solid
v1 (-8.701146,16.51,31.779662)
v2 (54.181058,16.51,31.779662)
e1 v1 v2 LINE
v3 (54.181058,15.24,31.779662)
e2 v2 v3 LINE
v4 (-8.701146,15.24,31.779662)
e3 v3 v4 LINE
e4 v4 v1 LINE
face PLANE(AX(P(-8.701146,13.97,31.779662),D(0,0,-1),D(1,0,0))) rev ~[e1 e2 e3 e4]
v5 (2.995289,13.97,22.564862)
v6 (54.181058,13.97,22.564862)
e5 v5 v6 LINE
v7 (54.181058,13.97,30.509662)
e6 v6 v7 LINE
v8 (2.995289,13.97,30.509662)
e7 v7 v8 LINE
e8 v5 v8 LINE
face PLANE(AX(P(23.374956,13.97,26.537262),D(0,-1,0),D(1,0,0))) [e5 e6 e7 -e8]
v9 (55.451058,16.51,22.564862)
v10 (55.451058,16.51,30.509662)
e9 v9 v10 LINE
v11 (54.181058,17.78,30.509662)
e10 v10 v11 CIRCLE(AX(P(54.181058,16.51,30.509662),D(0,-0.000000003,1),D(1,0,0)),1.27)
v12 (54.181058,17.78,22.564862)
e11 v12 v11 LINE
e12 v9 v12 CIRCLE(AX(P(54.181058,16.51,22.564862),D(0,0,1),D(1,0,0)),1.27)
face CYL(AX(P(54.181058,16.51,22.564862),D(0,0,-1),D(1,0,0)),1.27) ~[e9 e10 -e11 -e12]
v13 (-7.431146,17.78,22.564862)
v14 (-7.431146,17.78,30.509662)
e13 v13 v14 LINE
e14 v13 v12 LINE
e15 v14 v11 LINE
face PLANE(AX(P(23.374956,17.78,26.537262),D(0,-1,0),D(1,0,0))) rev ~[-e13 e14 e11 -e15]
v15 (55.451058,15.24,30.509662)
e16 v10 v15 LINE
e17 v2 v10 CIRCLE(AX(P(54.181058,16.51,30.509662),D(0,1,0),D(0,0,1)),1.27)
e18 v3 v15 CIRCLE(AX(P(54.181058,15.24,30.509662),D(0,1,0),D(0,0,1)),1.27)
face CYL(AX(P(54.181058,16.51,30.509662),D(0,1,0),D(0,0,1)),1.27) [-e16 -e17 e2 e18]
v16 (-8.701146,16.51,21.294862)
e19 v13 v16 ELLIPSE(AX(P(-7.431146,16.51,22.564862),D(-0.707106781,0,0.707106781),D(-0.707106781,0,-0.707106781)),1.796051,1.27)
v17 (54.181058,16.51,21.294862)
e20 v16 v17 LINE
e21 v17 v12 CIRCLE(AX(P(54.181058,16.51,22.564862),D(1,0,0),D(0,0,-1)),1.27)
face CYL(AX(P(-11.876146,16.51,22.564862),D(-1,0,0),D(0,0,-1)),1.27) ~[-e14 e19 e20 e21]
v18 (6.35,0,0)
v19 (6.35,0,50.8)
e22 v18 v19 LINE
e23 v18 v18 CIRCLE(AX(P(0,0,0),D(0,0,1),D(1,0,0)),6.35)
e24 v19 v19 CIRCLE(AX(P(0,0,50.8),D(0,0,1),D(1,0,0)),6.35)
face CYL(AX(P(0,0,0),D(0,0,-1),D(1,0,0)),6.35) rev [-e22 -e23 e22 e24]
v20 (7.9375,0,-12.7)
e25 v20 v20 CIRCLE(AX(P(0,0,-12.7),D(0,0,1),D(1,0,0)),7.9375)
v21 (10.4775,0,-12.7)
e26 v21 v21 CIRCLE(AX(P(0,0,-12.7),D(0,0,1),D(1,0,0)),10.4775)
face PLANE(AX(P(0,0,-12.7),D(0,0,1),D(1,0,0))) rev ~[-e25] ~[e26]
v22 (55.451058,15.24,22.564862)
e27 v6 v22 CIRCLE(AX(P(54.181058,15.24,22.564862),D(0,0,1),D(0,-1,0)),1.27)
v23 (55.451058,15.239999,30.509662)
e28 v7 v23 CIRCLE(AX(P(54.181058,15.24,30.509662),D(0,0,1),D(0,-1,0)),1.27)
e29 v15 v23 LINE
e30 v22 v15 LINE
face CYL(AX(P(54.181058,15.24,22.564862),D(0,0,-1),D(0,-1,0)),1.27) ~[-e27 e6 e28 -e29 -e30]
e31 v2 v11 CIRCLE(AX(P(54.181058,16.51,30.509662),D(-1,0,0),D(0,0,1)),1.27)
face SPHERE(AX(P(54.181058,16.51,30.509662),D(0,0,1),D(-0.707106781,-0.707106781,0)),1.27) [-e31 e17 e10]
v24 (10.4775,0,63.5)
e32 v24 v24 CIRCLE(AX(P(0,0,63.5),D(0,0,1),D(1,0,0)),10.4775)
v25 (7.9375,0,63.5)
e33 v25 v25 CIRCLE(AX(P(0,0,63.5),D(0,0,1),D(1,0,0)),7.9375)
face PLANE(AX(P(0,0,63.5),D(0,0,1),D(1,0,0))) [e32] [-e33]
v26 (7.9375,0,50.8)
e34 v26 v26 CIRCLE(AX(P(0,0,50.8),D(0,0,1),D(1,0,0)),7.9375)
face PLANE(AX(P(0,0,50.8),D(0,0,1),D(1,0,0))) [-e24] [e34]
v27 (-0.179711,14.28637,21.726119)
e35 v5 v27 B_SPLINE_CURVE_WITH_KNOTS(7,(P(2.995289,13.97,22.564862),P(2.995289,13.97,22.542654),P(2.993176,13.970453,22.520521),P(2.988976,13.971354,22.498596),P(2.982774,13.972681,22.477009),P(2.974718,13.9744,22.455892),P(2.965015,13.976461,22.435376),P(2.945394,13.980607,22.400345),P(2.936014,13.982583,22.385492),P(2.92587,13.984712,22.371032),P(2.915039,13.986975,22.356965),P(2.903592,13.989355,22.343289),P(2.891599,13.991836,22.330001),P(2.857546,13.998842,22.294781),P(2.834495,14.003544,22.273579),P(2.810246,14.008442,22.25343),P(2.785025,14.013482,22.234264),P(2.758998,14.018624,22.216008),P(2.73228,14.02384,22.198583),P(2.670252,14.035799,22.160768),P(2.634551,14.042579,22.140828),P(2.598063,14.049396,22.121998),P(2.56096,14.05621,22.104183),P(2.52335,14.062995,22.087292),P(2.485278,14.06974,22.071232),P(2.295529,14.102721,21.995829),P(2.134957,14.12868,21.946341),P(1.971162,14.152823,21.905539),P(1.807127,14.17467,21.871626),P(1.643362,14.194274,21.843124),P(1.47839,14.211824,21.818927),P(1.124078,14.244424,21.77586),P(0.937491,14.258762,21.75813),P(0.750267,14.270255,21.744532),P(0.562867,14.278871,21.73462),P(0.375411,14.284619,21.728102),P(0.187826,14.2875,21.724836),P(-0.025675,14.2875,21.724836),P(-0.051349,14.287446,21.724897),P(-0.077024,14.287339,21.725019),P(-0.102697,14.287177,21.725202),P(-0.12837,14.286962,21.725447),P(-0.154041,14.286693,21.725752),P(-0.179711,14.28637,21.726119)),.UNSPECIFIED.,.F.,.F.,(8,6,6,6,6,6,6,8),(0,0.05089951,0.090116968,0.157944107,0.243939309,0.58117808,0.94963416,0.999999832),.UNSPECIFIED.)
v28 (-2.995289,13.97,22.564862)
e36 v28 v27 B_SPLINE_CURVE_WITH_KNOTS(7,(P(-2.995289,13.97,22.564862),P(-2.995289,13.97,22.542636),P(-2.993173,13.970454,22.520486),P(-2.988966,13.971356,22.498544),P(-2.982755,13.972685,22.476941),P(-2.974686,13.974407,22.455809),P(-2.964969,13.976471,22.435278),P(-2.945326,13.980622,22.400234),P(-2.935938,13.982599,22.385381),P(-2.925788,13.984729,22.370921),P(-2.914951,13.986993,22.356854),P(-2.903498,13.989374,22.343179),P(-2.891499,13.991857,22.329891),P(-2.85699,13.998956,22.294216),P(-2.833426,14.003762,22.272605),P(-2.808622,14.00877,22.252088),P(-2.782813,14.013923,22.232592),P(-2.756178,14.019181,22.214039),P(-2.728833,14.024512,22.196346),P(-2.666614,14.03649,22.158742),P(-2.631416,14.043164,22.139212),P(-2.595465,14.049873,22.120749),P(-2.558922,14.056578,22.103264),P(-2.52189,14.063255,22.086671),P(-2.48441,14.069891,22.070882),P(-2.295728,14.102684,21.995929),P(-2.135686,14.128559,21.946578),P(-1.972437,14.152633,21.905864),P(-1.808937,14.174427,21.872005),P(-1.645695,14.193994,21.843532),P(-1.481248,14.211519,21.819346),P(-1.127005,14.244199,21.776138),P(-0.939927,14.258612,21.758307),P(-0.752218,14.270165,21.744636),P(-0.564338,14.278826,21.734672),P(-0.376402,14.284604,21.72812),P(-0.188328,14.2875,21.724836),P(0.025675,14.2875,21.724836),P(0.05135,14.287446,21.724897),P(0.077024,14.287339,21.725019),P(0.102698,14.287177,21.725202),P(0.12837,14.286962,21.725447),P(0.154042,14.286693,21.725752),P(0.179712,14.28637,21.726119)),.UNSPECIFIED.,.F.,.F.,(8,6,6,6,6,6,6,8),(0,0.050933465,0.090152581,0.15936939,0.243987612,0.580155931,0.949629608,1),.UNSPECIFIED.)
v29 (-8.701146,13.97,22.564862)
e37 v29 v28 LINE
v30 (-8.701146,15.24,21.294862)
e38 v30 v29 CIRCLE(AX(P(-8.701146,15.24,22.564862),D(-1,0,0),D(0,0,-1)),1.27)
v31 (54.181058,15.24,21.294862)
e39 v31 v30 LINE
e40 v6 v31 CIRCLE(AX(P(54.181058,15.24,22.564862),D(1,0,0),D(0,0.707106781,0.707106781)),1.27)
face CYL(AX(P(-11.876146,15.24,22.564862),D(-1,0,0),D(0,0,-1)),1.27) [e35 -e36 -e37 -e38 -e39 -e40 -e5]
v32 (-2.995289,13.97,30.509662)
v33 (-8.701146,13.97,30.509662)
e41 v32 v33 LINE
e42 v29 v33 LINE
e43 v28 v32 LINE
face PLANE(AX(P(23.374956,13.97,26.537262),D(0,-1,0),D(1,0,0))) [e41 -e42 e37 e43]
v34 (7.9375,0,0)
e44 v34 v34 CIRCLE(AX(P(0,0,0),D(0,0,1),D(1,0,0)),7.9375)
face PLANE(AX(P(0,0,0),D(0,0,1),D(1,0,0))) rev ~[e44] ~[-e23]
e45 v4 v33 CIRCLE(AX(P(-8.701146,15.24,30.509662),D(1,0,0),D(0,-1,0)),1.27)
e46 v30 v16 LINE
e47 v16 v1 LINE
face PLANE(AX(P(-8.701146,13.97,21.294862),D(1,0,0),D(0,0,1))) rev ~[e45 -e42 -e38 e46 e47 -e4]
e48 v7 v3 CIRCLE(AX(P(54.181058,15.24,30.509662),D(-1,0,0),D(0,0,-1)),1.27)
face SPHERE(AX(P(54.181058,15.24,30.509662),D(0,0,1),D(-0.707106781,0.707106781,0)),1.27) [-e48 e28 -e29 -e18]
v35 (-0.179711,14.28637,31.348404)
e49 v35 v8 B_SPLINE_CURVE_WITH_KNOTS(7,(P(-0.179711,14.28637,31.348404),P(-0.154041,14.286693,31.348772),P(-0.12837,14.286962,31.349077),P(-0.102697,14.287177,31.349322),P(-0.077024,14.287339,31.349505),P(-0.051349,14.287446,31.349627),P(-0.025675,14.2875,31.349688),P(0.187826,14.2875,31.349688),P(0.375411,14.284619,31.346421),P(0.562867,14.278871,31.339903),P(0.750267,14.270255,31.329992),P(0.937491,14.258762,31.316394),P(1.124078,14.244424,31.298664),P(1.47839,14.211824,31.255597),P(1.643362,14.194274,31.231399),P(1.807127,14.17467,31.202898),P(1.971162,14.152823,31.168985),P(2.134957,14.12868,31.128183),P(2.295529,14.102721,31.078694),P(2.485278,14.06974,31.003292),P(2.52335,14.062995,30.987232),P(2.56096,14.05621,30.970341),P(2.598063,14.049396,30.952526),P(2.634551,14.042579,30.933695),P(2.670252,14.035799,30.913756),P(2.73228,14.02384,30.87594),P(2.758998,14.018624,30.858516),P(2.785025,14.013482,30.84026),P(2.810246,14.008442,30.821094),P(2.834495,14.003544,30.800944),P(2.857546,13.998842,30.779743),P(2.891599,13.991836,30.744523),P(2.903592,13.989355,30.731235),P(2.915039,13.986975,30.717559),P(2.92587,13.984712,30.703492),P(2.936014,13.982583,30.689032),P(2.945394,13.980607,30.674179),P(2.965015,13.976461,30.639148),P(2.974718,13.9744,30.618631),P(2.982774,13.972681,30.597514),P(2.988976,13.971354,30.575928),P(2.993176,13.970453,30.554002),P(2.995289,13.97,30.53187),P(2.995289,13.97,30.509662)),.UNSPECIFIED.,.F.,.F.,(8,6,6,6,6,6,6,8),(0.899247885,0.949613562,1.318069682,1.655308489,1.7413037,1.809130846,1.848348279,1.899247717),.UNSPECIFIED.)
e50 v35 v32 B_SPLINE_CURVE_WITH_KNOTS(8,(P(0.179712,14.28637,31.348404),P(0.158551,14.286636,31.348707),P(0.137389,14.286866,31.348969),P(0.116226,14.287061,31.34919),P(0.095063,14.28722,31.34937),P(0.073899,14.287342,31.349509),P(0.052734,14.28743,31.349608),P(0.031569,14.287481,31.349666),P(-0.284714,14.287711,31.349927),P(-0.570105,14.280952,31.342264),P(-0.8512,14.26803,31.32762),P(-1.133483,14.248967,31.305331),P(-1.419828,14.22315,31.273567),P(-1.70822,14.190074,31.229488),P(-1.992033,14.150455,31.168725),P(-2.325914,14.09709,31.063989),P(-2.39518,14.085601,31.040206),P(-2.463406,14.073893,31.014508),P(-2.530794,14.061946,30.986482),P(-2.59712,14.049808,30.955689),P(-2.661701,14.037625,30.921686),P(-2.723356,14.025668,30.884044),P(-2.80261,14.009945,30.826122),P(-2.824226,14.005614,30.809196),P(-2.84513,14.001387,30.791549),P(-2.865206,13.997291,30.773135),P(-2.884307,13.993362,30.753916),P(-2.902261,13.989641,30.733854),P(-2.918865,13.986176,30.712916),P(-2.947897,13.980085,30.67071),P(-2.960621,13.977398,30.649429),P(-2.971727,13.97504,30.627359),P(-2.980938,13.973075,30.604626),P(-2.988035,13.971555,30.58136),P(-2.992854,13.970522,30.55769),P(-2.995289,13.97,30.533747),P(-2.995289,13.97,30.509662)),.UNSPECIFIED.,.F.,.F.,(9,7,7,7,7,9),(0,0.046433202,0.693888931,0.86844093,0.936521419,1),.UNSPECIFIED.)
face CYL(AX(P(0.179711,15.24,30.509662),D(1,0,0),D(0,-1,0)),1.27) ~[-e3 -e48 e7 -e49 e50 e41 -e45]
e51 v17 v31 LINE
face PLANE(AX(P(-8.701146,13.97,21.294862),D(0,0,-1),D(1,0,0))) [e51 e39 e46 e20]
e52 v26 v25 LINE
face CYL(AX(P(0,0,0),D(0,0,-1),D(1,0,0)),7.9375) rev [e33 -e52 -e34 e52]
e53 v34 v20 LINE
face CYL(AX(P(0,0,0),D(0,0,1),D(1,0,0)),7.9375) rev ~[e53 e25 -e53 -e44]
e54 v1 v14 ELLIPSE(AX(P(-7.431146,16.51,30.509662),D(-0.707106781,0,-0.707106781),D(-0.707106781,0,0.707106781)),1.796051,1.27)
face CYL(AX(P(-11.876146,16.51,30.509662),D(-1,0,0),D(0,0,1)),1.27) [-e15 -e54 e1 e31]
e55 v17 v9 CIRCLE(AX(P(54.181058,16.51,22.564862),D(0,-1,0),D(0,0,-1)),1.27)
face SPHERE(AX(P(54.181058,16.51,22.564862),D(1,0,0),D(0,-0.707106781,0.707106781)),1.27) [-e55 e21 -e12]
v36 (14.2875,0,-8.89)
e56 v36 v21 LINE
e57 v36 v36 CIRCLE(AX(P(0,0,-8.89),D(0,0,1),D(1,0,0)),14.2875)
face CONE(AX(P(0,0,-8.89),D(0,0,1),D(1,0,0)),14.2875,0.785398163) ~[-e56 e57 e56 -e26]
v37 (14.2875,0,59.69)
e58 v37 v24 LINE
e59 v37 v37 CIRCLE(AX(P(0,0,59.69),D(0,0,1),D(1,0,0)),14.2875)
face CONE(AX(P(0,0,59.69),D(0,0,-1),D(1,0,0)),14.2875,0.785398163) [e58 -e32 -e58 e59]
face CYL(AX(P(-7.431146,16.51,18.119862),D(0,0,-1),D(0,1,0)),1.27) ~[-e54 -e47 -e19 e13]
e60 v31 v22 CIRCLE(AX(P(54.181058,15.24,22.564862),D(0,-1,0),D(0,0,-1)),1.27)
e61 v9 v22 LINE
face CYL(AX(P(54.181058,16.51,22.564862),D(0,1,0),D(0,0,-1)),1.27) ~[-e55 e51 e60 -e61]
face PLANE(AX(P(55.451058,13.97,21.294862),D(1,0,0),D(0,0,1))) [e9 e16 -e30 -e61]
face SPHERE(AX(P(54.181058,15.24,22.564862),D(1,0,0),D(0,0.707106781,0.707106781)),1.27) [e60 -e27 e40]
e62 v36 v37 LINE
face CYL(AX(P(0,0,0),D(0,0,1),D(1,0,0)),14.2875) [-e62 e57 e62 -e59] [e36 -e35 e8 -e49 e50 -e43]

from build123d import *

# Parameters (mm, degrees)
F0_R          = 7.9375
F0_R_2        = 6.35
F2_DEPTH      = 50.8
F3_R          = 14.2875
F3_R_2        = 7.9375
F4_DEPTH      = 63.5
F4_DEPTH_BACK = 12.7
F5_SIZE       = 3.81
F7_START      = -13.97
F6_W          = 64.1522035003
F6_H          = 10.4847997427
F7_DEPTH      = 3.81
F8_T1_DEPTH   = 66.0572035003
F8_T3_DEPTH   = 16.8347997427
F8_T5_DEPTH   = 7.9447997427
F8_T7_DEPTH   = 1.27
F8_S11_W      = 1.27
F8_S11_H      = 1.27
F8_T12_DEPTH  = 1.27
F8_S17_W      = 1.27
F8_S17_H      = 1.27
F8_T18_DEPTH  = 1.27
F8_S23_W      = 1.27
F8_S23_H      = 1.27
F8_T24_DEPTH  = 1.27
F8_S29_W      = 1.27
F8_S29_H      = 1.27
F8_T30_DEPTH  = 1.27
F8_T36_DEPTH  = 54.3607688419
F8_S37_R      = 14.2875
F8_T38_DEPTH  = 29
F8_T42_DEPTH  = 54.3607688419
F8_S43_R      = 14.2875
F8_T44_DEPTH  = 29
F8_T48_DEPTH  = 12.0558566395
F8_S49_R      = 14.2875
F8_T50_DEPTH  = 8
F8_T54_DEPTH  = 12.0558566395
F8_S55_R      = 14.2875
F8_T56_DEPTH  = 8


# Not quite as in the source:
# - a fillet or chamfer that OpenCascade refuses, or shapes differently, is made with other operations: its cross-section is extruded or revolved along the edge and cut away or added
# - a feature names something its author has since deleted; it is built from what else it names


with BuildPart() as f2:
    # F0 (on Top) → F2 (new body)
    with BuildSketch(Plane.XY):
        Circle(F0_R)
        Circle(F0_R_2, mode=Mode.SUBTRACT)
    extrude(amount=F2_DEPTH)

    # F3 (on face) → F4 (join, two sides)
    with BuildSketch(Plane.XY) as f4_sk:
        Circle(F3_R)
        Circle(F3_R_2, mode=Mode.SUBTRACT)
    extrude(amount=F4_DEPTH)
    extrude(f4_sk.sketch, amount=-F4_DEPTH_BACK)

    # F5
    f5_edges = [f2.edges().sort_by_distance(p)[0] for p in [
        (-14.2875, 0, 63.5),
        (-14.2875, 0, -12.7),
    ]]
    chamfer(f5_edges, length=F5_SIZE)

    # F6 (on Front) → F7 (join)
    with BuildSketch(Plane.XZ.offset(F7_START)):
        with Locations((23.3749561012, 26.5372619033)):
            Rectangle(F6_W, F6_H)
    extrude(amount=-F7_DEPTH)

    # F8: fillet of radius 1.27 on 11 edges, made by hand

    # F8_s2 → F8_t1 (cut)
    with BuildSketch(Plane.YZ.offset(-11.876145649)):
        with BuildLine():
            ThreePointArc((16.51, 31.7796617746), (17.4080256121, 31.4076873867), (17.78, 30.5096617746))
            Line((17.78, 30.5096617746), (17.78, 31.7796617746))
            Line((17.78, 31.7796617746), (16.51, 31.7796617746))
        make_face()
        with BuildLine():
            ThreePointArc((16.51, 21.2948620319), (17.4080256121, 21.6668364198), (17.78, 22.5648620319))
            Line((17.78, 22.5648620319), (17.78, 21.2948620319))
            Line((17.78, 21.2948620319), (16.51, 21.2948620319))
        make_face()
    extrude(amount=F8_T1_DEPTH, mode=Mode.SUBTRACT)

    # F8_s4 → F8_t3 (cut)
    with BuildSketch(Plane.XY.offset(18.1198620319)):
        with BuildLine():
            ThreePointArc((-7.431145649, 17.78), (-8.3291712611, 17.4080256121), (-8.701145649, 16.51))
            Line((-8.701145649, 16.51), (-8.701145649, 17.78))
            Line((-8.701145649, 17.78), (-7.431145649, 17.78))
        make_face()
    extrude(amount=F8_T3_DEPTH, mode=Mode.SUBTRACT)

    # F8_s6 → F8_t5 (cut)
    with BuildSketch(Plane.XY.offset(22.5648620319)):
        with BuildLine():
            ThreePointArc((54.1810578513, 13.97), (55.0790834634, 14.3419743879), (55.4510578513, 15.24))
            Line((55.4510578513, 15.24), (55.4510578513, 13.97))
            Line((55.4510578513, 13.97), (54.1810578513, 13.97))
        make_face()
        with BuildLine():
            ThreePointArc((55.4510578513, 16.51), (55.0790834634, 17.4080256121), (54.1810578513, 17.78))
            Line((54.1810578513, 17.78), (55.4510578513, 17.78))
            Line((55.4510578513, 17.78), (55.4510578513, 16.51))
        make_face()
    extrude(amount=F8_T5_DEPTH, mode=Mode.SUBTRACT)

    # F8_s8 → F8_t7 (cut)
    with BuildSketch(Plane.XZ.offset(-16.51)):
        with BuildLine():
            ThreePointArc((54.1810578513, 31.7796617746), (55.0790834634, 31.4076873867), (55.4510578513, 30.5096617746))
            Line((55.4510578513, 30.5096617746), (55.4510578513, 31.7796617746))
            Line((55.4510578513, 31.7796617746), (54.1810578513, 31.7796617746))
        make_face()
        with BuildLine():
            ThreePointArc((54.1810578513, 21.2948620319), (55.0790834634, 21.6668364198), (55.4510578513, 22.5648620319))
            Line((55.4510578513, 22.5648620319), (55.4510578513, 21.2948620319))
            Line((55.4510578513, 21.2948620319), (54.1810578513, 21.2948620319))
        make_face()
    extrude(amount=F8_T7_DEPTH, mode=Mode.SUBTRACT)


with BuildPart() as f8_tool10:
    # F8_s11 → F8_t12 (new body)
    with BuildSketch(Plane.XY.offset(30.5096617746)):
        with Locations((54.8160578513, 17.145)):
            Rectangle(F8_S11_W, F8_S11_H)
    extrude(amount=F8_T12_DEPTH)

    # F8_s13 → F8_t14 (revolve, cut)
    with BuildSketch(Plane(origin=(54.1810578513, 16.51, 30.5096617746), x_dir=(-0.7071067812, -0.7071067812, 0), z_dir=(-0.7071067812, 0.7071067812, 0))):
        with BuildLine():
            ThreePointArc((0, -1.27), (1.27, 0), (0, 1.27))
            Line((0, 1.27), (0, -1.27))
        make_face()
    revolve(axis=Axis((54.1810578513, 16.51, 30.5096617746), (0, 0, 1)), mode=Mode.SUBTRACT)


with BuildPart() as f2_1:
    add(f2.part)

    # F8_t9: cut F8_tool10
    add(f8_tool10.part, mode=Mode.SUBTRACT)


with BuildPart() as f8_tool16:
    # F8_s17 → F8_t18 (new body)
    with BuildSketch(Plane.YZ.offset(54.1810578513)):
        with Locations((17.145, 21.9298620319)):
            Rectangle(F8_S17_W, F8_S17_H)
    extrude(amount=F8_T18_DEPTH)

    # F8_s19 → F8_t20 (revolve, cut)
    with BuildSketch(Plane(origin=(54.1810578513, 16.51, 22.5648620319), x_dir=(0, -0.7071067812, 0.7071067812), z_dir=(0, 0.7071067812, 0.7071067812))):
        with BuildLine():
            ThreePointArc((0, -1.27), (1.27, 0), (0, 1.27))
            Line((0, 1.27), (0, -1.27))
        make_face()
    revolve(axis=Axis((54.1810578513, 16.51, 22.5648620319), (1, 0, 0)), mode=Mode.SUBTRACT)


with BuildPart() as f2_2:
    add(f2_1.part)

    # F8_t15: cut F8_tool16
    add(f8_tool16.part, mode=Mode.SUBTRACT)


with BuildPart() as f8_tool22:
    # F8_s23 → F8_t24 (new body)
    with BuildSketch(Plane.YZ.offset(54.1810578513)):
        with Locations((14.605, 21.9298620319)):
            Rectangle(F8_S23_W, F8_S23_H)
    extrude(amount=F8_T24_DEPTH)

    # F8_s25 → F8_t26 (revolve, cut)
    with BuildSketch(Plane(origin=(54.1810578513, 15.24, 22.5648620319), x_dir=(0, 0.7071067812, 0.7071067812), z_dir=(0, 0.7071067812, -0.7071067812))):
        with BuildLine():
            ThreePointArc((0, -1.27), (1.27, 0), (0, 1.27))
            Line((0, 1.27), (0, -1.27))
        make_face()
    revolve(axis=Axis((54.1810578513, 15.24, 22.5648620319), (1, 0, 0)), mode=Mode.SUBTRACT)


with BuildPart() as f2_3:
    add(f2_2.part)

    # F8_t21: cut F8_tool22
    add(f8_tool22.part, mode=Mode.SUBTRACT)


with BuildPart() as f8_tool28:
    # F8_s29 → F8_t30 (new body)
    with BuildSketch(Plane.XY.offset(30.5096617746)):
        with Locations((54.8160578513, 14.605)):
            Rectangle(F8_S29_W, F8_S29_H)
    extrude(amount=F8_T30_DEPTH)

    # F8_s31 → F8_t32 (revolve, cut)
    with BuildSketch(Plane(origin=(54.1810578513, 15.24, 30.5096617746), x_dir=(-0.7071067812, 0.7071067812, 0), z_dir=(0.7071067812, 0.7071067812, 0))):
        with BuildLine():
            ThreePointArc((0, -1.27), (1.27, 0), (0, 1.27))
            Line((0, 1.27), (0, -1.27))
        make_face()
    revolve(axis=Axis((54.1810578513, 15.24, 30.5096617746), (0, 0, 1)), mode=Mode.SUBTRACT)


with BuildPart() as f2_4:
    add(f2_3.part)

    # F8_t27: cut F8_tool28
    add(f8_tool28.part, mode=Mode.SUBTRACT)


with BuildPart() as f8_tool34:
    # F8_s35 → F8_t36 (new body)
    with BuildSketch(Plane.YZ.offset(-0.1797109906)):
        with BuildLine():
            ThreePointArc((13.97, 22.5648620319), (14.3419743879, 21.6668364198), (15.24, 21.2948620319))
            Line((15.24, 21.2948620319), (13.97, 21.2948620319))
            Line((13.97, 21.2948620319), (13.97, 22.5648620319))
        make_face()
    extrude(amount=F8_T36_DEPTH)

    # F8_s37 → F8_t38 (cut, symmetric)
    with BuildSketch(Plane.XY.offset(21.9)):
        Circle(F8_S37_R)
    extrude(amount=F8_T38_DEPTH, both=True, mode=Mode.SUBTRACT)


with BuildPart() as f2_5:
    add(f2_4.part)

    # F8_t33: cut F8_tool34
    add(f8_tool34.part, mode=Mode.SUBTRACT)


with BuildPart() as f8_tool40:
    # F8_s41 → F8_t42 (new body)
    with BuildSketch(Plane.YZ.offset(54.1810578513)):
        with BuildLine():
            ThreePointArc((13.97, 30.5096617746), (14.3419743879, 31.4076873867), (15.24, 31.7796617746))
            Line((15.24, 31.7796617746), (13.97, 31.7796617746))
            Line((13.97, 31.7796617746), (13.97, 30.5096617746))
        make_face()
    extrude(amount=-F8_T42_DEPTH)

    # F8_s43 → F8_t44 (cut, symmetric)
    with BuildSketch(Plane.XY.offset(31.1)):
        Circle(F8_S43_R)
    extrude(amount=F8_T44_DEPTH, both=True, mode=Mode.SUBTRACT)


with BuildPart() as f2_6:
    add(f2_5.part)

    # F8_t39: cut F8_tool40
    add(f8_tool40.part, mode=Mode.SUBTRACT)


with BuildPart() as f8_tool46:
    # F8_s47 → F8_t48 (new body)
    with BuildSketch(Plane.YZ.offset(-11.876145649)):
        with BuildLine():
            ThreePointArc((15.24, 21.2948620319), (14.3419743879, 21.6668364198), (13.97, 22.5648620319))
            Line((13.97, 22.5648620319), (13.97, 21.2948620319))
            Line((13.97, 21.2948620319), (15.24, 21.2948620319))
        make_face()
    extrude(amount=F8_T48_DEPTH)

    # F8_s49 → F8_t50 (cut, symmetric)
    with BuildSketch(Plane.XY.offset(21.9)):
        Circle(F8_S49_R)
    extrude(amount=F8_T50_DEPTH, both=True, mode=Mode.SUBTRACT)


with BuildPart() as f2_7:
    add(f2_6.part)

    # F8_t45: cut F8_tool46
    add(f8_tool46.part, mode=Mode.SUBTRACT)


with BuildPart() as f8_tool52:
    # F8_s53 → F8_t54 (new body)
    with BuildSketch(Plane.YZ.offset(0.1797109906)):
        with BuildLine():
            ThreePointArc((13.97, 30.5096617746), (14.3419743879, 31.4076873867), (15.24, 31.7796617746))
            Line((15.24, 31.7796617746), (13.97, 31.7796617746))
            Line((13.97, 31.7796617746), (13.97, 30.5096617746))
        make_face()
    extrude(amount=-F8_T54_DEPTH)

    # F8_s55 → F8_t56 (cut, symmetric)
    with BuildSketch(Plane.XY.offset(31.1)):
        Circle(F8_S55_R)
    extrude(amount=F8_T56_DEPTH, both=True, mode=Mode.SUBTRACT)


with BuildPart() as f2_8:
    add(f2_7.part)

    # F8_t51: cut F8_tool52
    add(f8_tool52.part, mode=Mode.SUBTRACT)


solid = f2_8.part
